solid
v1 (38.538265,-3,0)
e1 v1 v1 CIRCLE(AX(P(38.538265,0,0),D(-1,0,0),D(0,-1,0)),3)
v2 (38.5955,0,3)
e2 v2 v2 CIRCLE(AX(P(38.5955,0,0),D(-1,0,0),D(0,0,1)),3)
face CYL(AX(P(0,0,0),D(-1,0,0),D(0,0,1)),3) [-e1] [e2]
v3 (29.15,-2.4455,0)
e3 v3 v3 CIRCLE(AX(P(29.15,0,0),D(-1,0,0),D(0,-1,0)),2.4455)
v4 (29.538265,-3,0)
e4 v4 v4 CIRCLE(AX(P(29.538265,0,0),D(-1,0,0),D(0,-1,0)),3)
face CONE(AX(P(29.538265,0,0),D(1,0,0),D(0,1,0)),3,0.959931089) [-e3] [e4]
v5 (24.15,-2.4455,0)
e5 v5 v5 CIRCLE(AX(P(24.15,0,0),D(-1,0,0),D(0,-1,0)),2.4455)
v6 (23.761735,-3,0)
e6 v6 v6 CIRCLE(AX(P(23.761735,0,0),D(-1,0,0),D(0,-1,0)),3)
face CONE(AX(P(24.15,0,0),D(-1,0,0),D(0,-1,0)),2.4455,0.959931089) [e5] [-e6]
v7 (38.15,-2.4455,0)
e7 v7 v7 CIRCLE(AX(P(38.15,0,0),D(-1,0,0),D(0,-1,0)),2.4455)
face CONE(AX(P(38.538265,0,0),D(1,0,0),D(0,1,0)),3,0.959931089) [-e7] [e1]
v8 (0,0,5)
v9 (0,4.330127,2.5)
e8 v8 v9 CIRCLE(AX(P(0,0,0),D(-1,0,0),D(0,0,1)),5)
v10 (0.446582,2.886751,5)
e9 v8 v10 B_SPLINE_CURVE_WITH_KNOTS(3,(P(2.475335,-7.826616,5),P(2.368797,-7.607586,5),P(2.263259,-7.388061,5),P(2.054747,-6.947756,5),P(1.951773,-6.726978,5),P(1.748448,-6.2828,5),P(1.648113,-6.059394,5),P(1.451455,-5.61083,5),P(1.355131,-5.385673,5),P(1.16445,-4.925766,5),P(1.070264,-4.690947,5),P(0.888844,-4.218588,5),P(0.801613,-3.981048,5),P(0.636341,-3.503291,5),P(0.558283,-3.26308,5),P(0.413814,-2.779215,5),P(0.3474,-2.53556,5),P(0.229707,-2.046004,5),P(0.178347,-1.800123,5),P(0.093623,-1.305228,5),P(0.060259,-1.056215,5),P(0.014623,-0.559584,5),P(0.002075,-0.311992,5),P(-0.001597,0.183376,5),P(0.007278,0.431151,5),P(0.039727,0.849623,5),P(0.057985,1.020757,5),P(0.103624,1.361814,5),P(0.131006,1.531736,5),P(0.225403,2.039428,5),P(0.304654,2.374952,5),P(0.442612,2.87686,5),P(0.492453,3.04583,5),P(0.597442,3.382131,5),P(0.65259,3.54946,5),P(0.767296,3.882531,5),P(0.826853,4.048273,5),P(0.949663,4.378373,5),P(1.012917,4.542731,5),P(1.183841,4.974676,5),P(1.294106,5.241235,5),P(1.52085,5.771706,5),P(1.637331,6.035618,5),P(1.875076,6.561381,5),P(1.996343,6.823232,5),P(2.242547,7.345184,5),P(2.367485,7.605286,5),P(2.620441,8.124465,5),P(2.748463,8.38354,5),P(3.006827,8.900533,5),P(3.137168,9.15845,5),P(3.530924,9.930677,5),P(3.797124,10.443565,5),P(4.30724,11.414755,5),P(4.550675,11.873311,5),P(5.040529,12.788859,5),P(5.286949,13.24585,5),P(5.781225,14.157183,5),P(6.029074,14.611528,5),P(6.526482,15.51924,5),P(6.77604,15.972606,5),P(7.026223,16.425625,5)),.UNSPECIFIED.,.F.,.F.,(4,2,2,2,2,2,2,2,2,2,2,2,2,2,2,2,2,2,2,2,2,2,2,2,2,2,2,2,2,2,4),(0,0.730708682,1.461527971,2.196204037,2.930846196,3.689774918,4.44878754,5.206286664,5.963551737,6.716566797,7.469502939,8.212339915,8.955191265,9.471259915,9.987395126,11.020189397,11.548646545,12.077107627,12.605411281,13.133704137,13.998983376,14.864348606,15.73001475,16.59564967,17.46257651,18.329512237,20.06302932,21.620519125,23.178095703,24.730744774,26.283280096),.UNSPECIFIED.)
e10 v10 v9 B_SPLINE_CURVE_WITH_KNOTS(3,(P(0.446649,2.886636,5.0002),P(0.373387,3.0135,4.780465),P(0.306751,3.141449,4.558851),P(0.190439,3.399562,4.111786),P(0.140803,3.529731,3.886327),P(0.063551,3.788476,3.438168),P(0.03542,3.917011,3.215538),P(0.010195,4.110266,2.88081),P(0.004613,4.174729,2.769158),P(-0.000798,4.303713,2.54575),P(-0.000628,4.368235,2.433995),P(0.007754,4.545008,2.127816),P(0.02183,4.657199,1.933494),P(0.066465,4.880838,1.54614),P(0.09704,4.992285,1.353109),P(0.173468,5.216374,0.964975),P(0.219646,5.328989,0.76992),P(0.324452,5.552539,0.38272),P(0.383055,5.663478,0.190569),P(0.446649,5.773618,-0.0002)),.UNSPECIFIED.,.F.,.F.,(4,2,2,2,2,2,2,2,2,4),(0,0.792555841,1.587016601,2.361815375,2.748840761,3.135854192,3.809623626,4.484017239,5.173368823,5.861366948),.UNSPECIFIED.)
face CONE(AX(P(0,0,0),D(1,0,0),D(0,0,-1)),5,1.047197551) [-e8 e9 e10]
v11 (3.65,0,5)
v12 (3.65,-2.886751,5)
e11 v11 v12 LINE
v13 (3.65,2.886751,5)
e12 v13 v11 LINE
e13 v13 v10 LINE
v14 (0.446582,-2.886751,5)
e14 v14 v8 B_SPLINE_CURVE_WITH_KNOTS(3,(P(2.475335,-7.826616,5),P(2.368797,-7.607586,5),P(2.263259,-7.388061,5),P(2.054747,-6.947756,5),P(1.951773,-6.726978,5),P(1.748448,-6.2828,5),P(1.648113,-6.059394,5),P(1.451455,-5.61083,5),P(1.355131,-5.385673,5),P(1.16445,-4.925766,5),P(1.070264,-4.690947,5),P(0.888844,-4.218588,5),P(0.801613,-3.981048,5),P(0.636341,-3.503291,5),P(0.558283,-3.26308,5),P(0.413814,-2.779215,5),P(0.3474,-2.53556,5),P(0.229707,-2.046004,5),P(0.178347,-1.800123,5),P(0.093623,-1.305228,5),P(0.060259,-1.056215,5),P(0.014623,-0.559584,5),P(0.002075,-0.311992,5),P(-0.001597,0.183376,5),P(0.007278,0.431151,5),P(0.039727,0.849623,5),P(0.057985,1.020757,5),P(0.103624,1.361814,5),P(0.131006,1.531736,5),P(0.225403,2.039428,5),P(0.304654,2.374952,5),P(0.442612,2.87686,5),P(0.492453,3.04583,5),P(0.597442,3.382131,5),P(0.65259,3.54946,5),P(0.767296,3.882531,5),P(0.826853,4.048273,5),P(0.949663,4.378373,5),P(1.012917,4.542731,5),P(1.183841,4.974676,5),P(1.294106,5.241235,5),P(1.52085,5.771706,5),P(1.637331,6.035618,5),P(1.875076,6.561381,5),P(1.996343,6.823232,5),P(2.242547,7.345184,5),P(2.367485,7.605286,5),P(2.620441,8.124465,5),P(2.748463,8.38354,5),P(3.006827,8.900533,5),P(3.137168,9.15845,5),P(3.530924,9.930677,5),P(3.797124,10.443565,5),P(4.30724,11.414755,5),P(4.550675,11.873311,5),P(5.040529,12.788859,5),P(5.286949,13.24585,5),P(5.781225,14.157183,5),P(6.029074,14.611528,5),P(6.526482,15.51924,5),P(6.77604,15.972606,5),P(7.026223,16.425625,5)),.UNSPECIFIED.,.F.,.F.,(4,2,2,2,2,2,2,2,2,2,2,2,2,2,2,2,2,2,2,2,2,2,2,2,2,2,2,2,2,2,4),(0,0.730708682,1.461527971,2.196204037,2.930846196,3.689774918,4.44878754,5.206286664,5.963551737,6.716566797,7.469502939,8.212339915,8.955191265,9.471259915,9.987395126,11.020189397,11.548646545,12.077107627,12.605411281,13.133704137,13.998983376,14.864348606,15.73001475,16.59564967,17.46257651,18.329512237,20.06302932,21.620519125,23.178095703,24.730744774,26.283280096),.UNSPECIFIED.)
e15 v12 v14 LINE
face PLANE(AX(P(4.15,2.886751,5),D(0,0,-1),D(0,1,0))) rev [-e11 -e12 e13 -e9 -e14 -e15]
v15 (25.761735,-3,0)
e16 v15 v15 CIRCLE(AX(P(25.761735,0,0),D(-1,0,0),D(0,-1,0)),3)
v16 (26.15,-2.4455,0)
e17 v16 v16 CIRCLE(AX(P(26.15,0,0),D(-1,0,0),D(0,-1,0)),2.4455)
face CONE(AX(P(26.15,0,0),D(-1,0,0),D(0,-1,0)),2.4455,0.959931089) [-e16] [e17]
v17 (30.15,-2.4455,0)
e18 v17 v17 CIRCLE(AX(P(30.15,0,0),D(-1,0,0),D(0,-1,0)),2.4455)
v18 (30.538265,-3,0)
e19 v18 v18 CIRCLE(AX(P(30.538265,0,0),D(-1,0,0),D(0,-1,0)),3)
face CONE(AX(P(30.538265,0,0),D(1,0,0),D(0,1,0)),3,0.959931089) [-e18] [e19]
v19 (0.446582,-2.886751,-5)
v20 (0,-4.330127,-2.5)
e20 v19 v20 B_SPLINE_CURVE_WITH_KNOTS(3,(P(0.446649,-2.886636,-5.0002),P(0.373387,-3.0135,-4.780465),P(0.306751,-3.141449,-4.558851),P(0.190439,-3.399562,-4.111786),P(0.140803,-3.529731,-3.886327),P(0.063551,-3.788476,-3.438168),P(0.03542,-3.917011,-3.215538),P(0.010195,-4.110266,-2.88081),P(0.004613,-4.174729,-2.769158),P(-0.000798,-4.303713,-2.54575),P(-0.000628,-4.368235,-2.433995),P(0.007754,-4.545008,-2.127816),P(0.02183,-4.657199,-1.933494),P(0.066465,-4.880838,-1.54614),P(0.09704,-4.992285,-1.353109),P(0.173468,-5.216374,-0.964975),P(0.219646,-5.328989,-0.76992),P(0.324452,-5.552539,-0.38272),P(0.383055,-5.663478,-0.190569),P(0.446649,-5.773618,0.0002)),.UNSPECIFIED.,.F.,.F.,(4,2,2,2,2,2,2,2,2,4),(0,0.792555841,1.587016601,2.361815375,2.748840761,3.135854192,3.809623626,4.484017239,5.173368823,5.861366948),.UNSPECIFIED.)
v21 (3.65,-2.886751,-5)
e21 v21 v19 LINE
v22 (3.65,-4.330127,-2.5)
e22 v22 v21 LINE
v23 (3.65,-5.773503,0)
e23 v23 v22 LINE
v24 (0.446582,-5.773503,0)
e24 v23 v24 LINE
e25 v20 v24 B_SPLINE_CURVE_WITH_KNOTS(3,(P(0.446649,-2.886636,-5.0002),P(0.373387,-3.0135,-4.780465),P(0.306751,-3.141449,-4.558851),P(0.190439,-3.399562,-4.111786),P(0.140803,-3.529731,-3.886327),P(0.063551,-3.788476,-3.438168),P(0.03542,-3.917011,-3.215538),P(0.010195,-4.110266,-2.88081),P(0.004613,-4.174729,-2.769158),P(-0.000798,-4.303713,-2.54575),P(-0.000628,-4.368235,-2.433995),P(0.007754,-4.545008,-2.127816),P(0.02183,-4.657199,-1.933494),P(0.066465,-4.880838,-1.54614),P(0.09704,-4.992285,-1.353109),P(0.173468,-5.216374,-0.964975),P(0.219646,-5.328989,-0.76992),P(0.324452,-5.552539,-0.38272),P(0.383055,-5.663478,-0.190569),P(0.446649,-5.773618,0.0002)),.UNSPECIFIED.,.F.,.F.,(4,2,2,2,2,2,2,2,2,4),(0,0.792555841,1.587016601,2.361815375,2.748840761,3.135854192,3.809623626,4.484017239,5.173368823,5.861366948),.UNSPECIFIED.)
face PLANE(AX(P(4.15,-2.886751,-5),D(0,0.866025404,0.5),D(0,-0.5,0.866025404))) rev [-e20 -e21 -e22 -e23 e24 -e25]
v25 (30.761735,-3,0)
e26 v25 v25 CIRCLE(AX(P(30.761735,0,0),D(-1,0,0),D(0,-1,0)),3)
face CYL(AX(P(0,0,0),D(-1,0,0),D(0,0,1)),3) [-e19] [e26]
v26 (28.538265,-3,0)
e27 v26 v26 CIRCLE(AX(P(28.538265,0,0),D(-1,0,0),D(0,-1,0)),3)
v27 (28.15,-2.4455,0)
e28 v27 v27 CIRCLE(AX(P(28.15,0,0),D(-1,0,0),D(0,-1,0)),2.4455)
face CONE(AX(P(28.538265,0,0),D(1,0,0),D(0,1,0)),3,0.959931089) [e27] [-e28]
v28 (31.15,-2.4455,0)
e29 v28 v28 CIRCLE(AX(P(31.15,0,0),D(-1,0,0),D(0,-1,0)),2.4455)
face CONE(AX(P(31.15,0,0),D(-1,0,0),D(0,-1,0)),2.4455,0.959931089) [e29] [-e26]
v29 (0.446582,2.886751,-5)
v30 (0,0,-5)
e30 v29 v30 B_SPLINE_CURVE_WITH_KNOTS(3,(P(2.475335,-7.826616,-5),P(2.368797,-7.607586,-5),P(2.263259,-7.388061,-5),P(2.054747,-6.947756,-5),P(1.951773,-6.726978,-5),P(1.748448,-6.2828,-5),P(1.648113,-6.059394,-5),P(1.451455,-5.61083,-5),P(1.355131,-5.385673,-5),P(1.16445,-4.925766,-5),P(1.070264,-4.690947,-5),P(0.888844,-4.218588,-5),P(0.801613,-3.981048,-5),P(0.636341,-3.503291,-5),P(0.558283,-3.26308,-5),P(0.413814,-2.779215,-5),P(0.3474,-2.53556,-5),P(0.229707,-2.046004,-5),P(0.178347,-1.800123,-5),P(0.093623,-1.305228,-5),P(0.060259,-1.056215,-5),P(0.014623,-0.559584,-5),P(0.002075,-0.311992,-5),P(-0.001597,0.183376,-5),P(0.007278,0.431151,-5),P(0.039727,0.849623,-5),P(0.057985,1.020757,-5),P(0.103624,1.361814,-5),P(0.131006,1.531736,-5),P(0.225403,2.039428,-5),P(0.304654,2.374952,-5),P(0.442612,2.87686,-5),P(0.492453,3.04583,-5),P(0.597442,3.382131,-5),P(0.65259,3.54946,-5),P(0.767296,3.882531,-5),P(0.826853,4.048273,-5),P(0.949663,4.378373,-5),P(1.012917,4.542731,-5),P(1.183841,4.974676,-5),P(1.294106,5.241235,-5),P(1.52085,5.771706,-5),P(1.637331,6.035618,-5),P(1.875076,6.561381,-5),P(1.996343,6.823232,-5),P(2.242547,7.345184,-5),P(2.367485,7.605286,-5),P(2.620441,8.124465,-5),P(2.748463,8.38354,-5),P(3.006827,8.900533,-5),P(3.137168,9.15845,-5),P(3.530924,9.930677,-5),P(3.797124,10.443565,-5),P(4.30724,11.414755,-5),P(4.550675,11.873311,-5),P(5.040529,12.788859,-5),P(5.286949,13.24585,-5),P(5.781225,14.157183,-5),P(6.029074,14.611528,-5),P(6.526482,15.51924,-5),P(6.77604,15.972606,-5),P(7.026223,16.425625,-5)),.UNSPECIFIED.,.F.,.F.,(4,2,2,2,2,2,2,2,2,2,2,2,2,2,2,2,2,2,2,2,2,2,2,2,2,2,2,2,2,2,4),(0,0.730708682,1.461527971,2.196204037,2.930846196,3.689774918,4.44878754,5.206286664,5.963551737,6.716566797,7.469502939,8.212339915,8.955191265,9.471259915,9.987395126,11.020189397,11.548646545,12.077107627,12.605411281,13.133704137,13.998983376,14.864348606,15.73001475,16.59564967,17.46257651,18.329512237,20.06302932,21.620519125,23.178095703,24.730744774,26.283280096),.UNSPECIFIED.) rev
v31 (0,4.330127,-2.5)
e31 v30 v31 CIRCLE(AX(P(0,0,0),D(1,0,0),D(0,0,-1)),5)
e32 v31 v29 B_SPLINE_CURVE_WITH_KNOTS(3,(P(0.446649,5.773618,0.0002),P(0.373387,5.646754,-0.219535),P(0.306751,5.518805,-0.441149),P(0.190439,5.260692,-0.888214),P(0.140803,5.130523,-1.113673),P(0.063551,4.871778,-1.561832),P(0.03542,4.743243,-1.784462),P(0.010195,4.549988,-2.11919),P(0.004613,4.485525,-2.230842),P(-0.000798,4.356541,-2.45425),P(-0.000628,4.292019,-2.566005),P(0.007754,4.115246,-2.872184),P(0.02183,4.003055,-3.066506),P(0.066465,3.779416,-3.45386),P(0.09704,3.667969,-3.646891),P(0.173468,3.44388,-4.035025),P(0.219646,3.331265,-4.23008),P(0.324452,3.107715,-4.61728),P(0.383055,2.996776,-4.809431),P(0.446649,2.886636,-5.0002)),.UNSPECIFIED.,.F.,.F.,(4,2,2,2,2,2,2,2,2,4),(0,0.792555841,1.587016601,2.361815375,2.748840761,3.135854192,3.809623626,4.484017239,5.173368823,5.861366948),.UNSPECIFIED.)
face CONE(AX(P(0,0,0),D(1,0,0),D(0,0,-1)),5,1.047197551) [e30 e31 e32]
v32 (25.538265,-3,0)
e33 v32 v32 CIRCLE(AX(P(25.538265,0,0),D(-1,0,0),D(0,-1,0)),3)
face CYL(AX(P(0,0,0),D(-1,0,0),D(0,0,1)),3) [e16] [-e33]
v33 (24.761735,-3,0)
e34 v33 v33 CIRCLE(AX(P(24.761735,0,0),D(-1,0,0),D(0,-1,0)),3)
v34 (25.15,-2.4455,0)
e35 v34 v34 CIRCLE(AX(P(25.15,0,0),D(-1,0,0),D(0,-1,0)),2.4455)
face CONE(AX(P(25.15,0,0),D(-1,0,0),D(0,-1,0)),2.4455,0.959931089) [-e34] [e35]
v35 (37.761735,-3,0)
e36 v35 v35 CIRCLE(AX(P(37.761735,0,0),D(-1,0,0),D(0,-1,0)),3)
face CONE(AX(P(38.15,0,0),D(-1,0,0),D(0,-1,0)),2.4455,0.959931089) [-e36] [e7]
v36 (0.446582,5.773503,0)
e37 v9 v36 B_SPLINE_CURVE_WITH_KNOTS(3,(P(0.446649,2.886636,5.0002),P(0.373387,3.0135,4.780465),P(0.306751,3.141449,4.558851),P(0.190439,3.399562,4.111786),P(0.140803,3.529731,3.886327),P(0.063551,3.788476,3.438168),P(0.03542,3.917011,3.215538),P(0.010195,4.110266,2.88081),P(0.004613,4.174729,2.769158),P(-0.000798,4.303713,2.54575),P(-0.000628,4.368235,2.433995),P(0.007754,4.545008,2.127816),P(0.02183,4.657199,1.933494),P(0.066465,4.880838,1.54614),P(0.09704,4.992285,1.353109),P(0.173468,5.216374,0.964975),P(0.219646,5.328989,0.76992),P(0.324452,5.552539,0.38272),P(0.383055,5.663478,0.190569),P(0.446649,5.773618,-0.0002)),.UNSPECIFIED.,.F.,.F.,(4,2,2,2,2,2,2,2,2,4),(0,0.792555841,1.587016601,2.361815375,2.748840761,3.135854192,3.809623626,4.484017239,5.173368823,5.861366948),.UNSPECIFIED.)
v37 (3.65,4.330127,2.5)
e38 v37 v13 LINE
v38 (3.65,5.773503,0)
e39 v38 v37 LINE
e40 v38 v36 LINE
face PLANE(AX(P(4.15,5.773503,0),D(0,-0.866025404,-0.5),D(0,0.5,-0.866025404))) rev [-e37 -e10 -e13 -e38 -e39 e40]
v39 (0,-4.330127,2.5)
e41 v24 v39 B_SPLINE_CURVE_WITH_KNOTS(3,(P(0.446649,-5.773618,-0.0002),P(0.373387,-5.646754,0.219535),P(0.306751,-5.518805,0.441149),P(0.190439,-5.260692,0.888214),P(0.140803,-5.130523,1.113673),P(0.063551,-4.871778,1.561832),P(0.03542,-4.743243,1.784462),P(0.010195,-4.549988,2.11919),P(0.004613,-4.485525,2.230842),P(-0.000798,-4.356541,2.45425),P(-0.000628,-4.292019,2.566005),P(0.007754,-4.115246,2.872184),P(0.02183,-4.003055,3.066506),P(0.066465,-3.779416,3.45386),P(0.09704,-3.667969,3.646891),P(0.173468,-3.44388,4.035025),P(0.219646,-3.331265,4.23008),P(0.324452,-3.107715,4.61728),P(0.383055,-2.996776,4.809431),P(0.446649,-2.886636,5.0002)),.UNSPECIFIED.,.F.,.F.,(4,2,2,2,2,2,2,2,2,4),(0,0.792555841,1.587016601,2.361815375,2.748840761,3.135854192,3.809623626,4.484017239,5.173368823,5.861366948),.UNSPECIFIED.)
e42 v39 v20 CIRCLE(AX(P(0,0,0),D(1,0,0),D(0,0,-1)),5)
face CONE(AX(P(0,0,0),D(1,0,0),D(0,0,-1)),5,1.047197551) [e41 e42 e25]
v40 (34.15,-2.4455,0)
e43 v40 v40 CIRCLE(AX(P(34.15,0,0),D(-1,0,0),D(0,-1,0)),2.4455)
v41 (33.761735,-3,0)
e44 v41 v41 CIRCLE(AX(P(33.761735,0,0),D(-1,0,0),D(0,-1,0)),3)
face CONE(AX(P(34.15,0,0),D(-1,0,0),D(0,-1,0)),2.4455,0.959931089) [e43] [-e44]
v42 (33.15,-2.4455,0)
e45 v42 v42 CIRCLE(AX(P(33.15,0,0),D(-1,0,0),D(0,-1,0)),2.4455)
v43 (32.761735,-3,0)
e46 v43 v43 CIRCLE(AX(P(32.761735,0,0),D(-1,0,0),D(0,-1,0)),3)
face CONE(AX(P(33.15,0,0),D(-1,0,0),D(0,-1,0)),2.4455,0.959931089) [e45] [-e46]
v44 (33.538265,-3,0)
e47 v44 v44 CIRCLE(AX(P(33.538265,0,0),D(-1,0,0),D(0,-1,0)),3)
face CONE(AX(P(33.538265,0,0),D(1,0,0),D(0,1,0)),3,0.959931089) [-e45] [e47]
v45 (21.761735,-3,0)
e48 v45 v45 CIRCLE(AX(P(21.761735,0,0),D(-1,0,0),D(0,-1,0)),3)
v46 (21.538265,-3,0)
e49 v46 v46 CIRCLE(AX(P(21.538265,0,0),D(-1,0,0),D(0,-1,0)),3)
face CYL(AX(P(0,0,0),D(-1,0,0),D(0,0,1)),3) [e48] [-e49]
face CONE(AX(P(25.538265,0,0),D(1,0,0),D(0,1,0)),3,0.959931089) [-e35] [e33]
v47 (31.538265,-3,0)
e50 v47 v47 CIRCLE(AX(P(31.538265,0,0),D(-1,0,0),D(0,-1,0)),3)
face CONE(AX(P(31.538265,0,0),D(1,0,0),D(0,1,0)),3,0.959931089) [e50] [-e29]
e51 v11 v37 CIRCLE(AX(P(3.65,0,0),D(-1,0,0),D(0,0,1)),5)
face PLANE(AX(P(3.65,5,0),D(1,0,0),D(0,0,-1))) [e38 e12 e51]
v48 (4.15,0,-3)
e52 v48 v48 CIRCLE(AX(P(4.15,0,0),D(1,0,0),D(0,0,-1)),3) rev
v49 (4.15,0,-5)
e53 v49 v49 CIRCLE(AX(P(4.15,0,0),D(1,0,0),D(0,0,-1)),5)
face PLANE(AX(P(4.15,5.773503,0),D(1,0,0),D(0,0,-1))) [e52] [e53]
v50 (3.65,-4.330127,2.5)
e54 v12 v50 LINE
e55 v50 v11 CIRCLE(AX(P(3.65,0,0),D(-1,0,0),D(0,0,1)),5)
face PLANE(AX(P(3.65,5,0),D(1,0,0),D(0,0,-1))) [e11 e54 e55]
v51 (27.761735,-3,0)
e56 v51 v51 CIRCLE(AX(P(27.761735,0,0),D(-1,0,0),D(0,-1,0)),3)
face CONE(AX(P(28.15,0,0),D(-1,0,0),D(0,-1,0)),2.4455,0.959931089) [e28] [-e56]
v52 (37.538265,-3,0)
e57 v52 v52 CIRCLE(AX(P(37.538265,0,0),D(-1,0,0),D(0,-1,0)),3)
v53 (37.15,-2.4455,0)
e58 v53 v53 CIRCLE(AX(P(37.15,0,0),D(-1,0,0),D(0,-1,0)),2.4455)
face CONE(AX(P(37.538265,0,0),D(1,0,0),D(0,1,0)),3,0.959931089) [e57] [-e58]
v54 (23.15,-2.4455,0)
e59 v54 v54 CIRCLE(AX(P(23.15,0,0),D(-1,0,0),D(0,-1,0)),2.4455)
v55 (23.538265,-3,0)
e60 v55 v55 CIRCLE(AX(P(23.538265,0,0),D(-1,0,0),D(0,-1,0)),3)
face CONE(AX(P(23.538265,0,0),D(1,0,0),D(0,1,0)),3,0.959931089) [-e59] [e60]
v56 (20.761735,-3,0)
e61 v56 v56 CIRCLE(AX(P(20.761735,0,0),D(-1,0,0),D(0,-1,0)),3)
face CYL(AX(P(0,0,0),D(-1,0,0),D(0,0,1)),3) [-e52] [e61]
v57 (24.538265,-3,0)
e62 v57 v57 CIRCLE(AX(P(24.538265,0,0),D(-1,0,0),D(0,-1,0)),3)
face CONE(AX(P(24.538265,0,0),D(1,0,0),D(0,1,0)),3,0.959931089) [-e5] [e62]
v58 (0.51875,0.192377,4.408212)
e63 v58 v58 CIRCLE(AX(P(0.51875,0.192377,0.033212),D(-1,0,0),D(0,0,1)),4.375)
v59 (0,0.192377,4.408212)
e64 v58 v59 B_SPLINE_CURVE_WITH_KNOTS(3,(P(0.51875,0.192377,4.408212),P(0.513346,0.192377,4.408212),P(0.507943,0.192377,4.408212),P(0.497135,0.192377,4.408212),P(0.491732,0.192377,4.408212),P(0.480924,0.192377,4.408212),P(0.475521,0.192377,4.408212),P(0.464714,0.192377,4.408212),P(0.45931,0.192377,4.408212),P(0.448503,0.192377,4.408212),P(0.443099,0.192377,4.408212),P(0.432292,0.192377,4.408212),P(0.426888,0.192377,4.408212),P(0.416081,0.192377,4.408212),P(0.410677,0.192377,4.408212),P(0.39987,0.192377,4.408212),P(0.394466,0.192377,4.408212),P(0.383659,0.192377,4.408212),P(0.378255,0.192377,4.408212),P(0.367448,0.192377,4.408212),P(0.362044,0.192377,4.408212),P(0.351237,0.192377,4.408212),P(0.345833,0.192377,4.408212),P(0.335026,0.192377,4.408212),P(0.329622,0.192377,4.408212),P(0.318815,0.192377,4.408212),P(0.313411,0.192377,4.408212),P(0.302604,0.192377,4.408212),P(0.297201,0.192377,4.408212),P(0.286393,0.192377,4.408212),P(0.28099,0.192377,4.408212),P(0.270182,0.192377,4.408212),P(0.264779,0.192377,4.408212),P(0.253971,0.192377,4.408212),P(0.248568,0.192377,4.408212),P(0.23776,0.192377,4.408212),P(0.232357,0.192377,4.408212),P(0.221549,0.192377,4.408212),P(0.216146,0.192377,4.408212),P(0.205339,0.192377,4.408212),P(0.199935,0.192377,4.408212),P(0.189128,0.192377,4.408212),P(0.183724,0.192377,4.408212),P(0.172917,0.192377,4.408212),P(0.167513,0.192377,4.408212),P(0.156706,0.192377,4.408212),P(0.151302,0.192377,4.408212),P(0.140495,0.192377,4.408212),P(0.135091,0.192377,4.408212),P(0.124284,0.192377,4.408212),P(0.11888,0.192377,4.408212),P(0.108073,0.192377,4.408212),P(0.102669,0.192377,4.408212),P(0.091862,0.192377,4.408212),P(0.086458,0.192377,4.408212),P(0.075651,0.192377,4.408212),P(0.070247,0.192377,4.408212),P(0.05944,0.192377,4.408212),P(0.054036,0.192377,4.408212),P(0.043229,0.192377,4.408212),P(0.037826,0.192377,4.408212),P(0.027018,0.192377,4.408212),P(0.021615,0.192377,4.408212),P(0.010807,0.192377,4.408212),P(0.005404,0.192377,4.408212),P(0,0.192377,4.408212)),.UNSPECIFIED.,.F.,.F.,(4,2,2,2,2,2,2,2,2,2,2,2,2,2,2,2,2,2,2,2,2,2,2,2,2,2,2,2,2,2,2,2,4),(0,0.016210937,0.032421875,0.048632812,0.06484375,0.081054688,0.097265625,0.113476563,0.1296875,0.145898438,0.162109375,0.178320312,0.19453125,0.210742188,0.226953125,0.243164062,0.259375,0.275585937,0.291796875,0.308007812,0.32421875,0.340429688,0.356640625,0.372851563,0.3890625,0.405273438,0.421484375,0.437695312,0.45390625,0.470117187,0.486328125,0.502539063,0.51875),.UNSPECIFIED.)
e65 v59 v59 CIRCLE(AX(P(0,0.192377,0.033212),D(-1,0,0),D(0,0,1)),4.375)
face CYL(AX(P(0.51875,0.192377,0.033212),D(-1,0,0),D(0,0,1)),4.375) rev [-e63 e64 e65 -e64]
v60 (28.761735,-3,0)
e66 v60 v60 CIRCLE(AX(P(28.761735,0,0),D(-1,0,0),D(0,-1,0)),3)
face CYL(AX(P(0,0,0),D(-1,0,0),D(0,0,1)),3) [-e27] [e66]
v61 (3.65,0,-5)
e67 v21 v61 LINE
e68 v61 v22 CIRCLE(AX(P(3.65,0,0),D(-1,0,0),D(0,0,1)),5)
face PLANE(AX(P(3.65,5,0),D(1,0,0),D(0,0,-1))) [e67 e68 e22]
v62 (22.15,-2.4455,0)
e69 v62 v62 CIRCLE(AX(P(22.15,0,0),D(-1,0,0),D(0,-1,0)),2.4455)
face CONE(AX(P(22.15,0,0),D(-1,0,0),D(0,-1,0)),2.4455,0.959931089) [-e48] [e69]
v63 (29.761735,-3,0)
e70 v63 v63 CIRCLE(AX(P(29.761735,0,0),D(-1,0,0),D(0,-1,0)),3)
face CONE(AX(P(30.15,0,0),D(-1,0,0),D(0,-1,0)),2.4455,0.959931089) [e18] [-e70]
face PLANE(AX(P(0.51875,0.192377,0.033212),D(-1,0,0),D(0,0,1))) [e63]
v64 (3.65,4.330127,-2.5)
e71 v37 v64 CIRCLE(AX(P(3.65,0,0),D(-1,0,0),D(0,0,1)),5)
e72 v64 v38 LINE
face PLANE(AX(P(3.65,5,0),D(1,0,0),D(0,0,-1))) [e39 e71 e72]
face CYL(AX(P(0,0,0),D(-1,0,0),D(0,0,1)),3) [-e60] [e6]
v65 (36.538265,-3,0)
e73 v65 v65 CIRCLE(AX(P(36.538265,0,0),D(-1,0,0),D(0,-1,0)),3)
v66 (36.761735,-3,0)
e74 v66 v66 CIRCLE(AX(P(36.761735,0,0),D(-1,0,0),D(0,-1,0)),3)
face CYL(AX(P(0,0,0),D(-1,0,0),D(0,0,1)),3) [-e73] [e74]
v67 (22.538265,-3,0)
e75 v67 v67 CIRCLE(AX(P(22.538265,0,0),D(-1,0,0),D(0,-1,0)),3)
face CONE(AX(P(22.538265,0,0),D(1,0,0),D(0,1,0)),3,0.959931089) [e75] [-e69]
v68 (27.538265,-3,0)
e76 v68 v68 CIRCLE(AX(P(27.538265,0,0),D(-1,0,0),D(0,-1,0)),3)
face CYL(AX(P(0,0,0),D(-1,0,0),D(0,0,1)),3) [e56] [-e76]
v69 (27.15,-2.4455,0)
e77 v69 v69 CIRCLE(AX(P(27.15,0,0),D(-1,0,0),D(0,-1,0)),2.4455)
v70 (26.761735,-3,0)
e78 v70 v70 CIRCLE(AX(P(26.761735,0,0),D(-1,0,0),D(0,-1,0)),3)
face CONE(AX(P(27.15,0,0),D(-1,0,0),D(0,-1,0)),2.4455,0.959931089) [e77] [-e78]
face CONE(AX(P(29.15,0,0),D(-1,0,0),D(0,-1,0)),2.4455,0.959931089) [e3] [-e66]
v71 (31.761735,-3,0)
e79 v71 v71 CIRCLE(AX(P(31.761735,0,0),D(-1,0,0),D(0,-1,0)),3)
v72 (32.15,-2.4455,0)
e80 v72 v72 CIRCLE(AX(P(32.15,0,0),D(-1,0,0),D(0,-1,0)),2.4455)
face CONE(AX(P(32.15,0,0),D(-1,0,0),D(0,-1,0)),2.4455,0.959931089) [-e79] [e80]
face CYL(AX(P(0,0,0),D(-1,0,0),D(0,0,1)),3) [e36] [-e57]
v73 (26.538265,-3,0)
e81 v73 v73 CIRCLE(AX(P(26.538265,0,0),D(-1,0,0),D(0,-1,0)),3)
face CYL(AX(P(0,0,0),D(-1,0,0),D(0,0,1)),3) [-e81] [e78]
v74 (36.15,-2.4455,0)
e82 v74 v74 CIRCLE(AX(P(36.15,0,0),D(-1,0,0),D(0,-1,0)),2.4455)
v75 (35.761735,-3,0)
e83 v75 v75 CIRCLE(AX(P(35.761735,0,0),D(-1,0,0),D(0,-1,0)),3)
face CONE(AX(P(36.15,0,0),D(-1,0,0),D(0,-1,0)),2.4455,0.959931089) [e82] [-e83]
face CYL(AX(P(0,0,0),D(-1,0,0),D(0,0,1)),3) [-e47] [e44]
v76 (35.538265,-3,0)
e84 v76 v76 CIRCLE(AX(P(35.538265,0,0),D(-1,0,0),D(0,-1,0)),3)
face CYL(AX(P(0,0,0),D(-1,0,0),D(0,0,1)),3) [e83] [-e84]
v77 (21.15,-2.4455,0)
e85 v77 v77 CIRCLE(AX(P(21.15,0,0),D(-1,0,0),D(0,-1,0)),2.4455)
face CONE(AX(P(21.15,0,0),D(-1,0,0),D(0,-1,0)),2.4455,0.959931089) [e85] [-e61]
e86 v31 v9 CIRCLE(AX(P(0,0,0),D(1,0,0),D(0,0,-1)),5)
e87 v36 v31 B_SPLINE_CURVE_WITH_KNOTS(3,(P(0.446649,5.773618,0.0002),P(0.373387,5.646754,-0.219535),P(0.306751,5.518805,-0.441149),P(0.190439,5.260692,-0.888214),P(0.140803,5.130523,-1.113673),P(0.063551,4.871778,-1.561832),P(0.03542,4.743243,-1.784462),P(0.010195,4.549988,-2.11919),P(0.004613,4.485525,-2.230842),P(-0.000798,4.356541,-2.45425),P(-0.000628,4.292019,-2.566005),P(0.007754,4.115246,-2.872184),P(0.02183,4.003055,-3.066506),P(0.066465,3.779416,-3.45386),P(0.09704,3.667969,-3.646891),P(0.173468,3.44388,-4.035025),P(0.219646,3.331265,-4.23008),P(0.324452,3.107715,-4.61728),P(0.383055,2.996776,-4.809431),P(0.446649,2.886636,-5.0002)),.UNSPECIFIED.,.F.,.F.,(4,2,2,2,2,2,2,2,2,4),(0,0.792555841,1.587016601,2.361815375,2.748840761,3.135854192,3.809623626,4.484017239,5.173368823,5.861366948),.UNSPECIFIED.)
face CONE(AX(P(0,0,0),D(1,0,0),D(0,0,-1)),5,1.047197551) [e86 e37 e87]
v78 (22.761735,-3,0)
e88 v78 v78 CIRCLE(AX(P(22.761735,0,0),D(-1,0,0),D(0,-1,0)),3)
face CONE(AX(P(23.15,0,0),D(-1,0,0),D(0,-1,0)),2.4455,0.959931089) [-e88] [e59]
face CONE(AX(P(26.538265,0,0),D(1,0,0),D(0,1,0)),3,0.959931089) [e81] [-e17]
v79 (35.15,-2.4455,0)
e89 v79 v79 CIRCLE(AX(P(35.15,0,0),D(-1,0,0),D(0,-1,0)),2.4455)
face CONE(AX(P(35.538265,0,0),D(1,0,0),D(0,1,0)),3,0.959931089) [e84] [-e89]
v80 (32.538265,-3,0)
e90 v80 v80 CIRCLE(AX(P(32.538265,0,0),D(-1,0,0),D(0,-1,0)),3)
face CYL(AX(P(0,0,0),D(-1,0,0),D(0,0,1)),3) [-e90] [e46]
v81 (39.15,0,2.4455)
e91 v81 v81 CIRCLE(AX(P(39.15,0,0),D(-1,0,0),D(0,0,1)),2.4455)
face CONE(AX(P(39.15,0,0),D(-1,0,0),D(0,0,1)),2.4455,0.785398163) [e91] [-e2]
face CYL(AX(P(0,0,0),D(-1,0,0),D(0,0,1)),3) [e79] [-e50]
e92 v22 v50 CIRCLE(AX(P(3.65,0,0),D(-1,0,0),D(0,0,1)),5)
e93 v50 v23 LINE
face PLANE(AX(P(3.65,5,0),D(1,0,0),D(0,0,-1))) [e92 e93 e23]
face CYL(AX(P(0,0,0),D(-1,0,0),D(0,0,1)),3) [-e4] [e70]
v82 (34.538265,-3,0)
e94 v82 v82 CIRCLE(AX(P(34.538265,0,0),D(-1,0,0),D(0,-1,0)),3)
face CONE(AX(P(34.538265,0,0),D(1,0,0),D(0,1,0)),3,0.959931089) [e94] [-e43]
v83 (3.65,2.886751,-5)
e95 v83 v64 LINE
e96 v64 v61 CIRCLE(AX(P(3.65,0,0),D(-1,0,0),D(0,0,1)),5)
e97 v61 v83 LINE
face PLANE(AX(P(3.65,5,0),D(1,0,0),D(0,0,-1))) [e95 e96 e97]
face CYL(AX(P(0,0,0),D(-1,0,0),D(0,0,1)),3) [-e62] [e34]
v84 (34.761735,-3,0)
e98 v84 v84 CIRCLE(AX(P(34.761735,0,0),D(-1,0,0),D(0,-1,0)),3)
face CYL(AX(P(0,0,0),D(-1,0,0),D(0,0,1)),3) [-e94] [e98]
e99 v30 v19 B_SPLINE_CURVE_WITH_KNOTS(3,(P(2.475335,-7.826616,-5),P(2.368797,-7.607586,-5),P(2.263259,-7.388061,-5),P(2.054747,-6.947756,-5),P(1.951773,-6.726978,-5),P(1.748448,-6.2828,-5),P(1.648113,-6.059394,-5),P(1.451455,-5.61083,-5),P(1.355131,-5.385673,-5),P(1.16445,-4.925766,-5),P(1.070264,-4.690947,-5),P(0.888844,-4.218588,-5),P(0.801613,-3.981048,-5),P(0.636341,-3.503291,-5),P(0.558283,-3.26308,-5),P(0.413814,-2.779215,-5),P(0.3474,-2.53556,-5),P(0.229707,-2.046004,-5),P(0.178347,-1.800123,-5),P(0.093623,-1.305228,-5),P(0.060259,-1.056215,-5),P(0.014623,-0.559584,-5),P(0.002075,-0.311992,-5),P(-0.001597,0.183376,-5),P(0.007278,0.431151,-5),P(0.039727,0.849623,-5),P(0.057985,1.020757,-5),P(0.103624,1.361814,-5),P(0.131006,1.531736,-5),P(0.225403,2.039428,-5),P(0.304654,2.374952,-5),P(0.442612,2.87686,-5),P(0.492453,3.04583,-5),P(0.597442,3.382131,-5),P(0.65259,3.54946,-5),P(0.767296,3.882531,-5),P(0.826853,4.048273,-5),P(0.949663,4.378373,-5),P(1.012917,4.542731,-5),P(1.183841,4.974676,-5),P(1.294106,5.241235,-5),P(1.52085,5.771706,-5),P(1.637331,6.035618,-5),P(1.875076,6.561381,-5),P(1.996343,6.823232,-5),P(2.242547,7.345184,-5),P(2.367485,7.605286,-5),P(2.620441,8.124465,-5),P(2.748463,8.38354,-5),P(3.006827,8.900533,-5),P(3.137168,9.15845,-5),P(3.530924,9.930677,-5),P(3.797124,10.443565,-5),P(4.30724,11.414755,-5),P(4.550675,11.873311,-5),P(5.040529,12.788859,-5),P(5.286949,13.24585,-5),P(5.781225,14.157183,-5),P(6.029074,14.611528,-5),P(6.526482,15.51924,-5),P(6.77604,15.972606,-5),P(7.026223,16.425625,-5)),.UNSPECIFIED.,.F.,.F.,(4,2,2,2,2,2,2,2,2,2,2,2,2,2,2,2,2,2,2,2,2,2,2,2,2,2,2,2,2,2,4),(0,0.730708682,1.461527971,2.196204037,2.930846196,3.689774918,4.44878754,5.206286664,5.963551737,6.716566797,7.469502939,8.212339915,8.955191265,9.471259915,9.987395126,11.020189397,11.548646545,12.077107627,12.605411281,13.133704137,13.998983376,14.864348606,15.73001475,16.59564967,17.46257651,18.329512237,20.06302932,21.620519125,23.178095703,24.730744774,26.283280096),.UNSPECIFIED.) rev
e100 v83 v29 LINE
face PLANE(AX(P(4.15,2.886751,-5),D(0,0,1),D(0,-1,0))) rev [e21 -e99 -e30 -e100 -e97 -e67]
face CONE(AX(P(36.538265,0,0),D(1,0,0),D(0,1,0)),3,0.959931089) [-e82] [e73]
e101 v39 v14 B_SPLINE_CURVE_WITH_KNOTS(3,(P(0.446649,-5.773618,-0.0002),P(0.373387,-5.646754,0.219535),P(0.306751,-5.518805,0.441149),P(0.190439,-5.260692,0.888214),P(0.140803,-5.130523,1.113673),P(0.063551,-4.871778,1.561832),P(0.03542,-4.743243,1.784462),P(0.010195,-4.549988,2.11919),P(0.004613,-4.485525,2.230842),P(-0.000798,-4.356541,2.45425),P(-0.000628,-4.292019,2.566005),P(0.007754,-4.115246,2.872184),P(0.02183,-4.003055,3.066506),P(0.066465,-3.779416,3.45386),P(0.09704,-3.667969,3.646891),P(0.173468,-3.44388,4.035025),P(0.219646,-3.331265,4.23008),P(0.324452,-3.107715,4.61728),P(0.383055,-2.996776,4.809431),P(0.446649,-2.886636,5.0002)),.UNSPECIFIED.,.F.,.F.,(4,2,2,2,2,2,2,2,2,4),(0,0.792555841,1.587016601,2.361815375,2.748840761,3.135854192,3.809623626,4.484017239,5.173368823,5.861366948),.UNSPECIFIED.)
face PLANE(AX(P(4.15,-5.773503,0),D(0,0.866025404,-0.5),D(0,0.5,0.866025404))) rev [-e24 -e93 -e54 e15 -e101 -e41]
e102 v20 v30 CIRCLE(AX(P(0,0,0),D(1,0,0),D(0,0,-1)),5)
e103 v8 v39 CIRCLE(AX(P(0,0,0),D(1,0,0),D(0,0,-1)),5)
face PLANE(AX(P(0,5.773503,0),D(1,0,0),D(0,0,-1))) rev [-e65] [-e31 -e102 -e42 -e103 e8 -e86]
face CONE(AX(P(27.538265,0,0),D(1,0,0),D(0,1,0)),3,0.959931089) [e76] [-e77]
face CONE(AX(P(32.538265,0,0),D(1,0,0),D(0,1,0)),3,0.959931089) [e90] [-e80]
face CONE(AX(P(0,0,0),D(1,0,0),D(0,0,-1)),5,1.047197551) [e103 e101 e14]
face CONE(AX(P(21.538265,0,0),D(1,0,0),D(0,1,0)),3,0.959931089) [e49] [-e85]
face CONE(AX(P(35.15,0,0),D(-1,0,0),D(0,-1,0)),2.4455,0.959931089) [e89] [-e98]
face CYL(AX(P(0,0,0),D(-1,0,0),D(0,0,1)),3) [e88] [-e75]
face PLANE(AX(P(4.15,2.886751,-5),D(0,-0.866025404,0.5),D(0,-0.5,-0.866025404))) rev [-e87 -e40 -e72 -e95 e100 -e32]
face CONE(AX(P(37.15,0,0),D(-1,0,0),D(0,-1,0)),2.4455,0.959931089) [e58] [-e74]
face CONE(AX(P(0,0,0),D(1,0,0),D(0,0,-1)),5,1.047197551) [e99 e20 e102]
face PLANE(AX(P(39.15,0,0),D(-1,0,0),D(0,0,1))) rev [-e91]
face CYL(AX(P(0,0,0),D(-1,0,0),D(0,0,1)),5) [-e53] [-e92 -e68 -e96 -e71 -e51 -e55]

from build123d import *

# Parameters (mm, degrees)
BASEHEAD_DEPTH     = 4.15
INDENT_START       = -0.51875
INDENT_2_OUTLINE_R = 4.375
INDENT_2_DEPTH     = 0.51875
SKETCH4_W          = 0.5
SKETCH4_H          = 10.773502692
THDSCHPAT_COUNT    = 18
THDSCHPAT_PITCH    = 1


# Read off the part's stored shape, not the designer's step: Indent
with BuildPart() as part:
    # Sketch1 → BaseHead (new body)
    with BuildSketch(Plane(origin=(0, 0, 0), x_dir=(0, 0, -1), z_dir=(1, 0, 0))):
        Polygon((5, 2.886751346), (5, -2.886751346), (0, -5.773502692), (-5, -2.886751346), (-5, 2.886751346), (0, 5.773502692), align=None)
    extrude(amount=BASEHEAD_DEPTH)

    # Indent outline → Indent (revolve)
    with BuildSketch(Plane.YX):
        Polygon((3, 4.15), (3, 38.5955), (2.4455, 39.15), (0, 39.15), (0, 4.15), align=None)
    revolve(axis=Axis((0, 0, 0), (1, 0, 0)))

    # Indent 2 outline → Indent 2 (cut)
    with BuildSketch(Plane.ZY.offset(INDENT_START)):
        with Locations((0.033212245, 0.192376607)):
            Circle(INDENT_2_OUTLINE_R)
    extrude(amount=INDENT_2_DEPTH, mode=Mode.SUBTRACT)

    # Sketch3 → HeadChamfer (revolve, cut)
    with BuildSketch(Plane.XY, mode=Mode.PRIVATE) as headchamfer_sk:
        Polygon((0, 5), (3.333333333, 10.773502692), (3.333333333, 15.773502692), (-10, 15.773502692), (-10, 5), align=None)
    revolve(headchamfer_sk.sketch.rotate(Axis((0, 0, 0), (1, 0, 0)), 90), axis=Axis((0, 0, 0), (1, 0, 0)), mode=Mode.SUBTRACT)

    # Sketch4 → BearingFace (revolve, cut)
    with BuildSketch(Plane.XY, mode=Mode.PRIVATE) as bearingface_sk:
        with Locations((3.9, 10.386751346)):
            Rectangle(SKETCH4_W, SKETCH4_H)
    revolve(bearingface_sk.sketch.rotate(Axis((0, 0, 0), (1, 0, 0)), 90), axis=Axis((0, 0, 0), (1, 0, 0)), mode=Mode.SUBTRACT)

    # ThdSchSke → ThreadSchematic (revolve, cut)
    with BuildSketch(Plane.XY):
        Polygon((21.15, -2.4455), (20.76173492, -3), (20.76173492, -3.75), (21.53826508, -3.75), (21.53826508, -3), align=None)
    threadschematic = revolve(axis=Axis((-3.175, 0, 0), (1, 0, 0)), mode=Mode.SUBTRACT)

    # ThdSchPat: ThreadSchematic ×18
    with Locations(*[(i * THDSCHPAT_PITCH, 0, 0) for i in range(1, THDSCHPAT_COUNT)]):
        add(threadschematic, mode=Mode.SUBTRACT)


solid = part.part
